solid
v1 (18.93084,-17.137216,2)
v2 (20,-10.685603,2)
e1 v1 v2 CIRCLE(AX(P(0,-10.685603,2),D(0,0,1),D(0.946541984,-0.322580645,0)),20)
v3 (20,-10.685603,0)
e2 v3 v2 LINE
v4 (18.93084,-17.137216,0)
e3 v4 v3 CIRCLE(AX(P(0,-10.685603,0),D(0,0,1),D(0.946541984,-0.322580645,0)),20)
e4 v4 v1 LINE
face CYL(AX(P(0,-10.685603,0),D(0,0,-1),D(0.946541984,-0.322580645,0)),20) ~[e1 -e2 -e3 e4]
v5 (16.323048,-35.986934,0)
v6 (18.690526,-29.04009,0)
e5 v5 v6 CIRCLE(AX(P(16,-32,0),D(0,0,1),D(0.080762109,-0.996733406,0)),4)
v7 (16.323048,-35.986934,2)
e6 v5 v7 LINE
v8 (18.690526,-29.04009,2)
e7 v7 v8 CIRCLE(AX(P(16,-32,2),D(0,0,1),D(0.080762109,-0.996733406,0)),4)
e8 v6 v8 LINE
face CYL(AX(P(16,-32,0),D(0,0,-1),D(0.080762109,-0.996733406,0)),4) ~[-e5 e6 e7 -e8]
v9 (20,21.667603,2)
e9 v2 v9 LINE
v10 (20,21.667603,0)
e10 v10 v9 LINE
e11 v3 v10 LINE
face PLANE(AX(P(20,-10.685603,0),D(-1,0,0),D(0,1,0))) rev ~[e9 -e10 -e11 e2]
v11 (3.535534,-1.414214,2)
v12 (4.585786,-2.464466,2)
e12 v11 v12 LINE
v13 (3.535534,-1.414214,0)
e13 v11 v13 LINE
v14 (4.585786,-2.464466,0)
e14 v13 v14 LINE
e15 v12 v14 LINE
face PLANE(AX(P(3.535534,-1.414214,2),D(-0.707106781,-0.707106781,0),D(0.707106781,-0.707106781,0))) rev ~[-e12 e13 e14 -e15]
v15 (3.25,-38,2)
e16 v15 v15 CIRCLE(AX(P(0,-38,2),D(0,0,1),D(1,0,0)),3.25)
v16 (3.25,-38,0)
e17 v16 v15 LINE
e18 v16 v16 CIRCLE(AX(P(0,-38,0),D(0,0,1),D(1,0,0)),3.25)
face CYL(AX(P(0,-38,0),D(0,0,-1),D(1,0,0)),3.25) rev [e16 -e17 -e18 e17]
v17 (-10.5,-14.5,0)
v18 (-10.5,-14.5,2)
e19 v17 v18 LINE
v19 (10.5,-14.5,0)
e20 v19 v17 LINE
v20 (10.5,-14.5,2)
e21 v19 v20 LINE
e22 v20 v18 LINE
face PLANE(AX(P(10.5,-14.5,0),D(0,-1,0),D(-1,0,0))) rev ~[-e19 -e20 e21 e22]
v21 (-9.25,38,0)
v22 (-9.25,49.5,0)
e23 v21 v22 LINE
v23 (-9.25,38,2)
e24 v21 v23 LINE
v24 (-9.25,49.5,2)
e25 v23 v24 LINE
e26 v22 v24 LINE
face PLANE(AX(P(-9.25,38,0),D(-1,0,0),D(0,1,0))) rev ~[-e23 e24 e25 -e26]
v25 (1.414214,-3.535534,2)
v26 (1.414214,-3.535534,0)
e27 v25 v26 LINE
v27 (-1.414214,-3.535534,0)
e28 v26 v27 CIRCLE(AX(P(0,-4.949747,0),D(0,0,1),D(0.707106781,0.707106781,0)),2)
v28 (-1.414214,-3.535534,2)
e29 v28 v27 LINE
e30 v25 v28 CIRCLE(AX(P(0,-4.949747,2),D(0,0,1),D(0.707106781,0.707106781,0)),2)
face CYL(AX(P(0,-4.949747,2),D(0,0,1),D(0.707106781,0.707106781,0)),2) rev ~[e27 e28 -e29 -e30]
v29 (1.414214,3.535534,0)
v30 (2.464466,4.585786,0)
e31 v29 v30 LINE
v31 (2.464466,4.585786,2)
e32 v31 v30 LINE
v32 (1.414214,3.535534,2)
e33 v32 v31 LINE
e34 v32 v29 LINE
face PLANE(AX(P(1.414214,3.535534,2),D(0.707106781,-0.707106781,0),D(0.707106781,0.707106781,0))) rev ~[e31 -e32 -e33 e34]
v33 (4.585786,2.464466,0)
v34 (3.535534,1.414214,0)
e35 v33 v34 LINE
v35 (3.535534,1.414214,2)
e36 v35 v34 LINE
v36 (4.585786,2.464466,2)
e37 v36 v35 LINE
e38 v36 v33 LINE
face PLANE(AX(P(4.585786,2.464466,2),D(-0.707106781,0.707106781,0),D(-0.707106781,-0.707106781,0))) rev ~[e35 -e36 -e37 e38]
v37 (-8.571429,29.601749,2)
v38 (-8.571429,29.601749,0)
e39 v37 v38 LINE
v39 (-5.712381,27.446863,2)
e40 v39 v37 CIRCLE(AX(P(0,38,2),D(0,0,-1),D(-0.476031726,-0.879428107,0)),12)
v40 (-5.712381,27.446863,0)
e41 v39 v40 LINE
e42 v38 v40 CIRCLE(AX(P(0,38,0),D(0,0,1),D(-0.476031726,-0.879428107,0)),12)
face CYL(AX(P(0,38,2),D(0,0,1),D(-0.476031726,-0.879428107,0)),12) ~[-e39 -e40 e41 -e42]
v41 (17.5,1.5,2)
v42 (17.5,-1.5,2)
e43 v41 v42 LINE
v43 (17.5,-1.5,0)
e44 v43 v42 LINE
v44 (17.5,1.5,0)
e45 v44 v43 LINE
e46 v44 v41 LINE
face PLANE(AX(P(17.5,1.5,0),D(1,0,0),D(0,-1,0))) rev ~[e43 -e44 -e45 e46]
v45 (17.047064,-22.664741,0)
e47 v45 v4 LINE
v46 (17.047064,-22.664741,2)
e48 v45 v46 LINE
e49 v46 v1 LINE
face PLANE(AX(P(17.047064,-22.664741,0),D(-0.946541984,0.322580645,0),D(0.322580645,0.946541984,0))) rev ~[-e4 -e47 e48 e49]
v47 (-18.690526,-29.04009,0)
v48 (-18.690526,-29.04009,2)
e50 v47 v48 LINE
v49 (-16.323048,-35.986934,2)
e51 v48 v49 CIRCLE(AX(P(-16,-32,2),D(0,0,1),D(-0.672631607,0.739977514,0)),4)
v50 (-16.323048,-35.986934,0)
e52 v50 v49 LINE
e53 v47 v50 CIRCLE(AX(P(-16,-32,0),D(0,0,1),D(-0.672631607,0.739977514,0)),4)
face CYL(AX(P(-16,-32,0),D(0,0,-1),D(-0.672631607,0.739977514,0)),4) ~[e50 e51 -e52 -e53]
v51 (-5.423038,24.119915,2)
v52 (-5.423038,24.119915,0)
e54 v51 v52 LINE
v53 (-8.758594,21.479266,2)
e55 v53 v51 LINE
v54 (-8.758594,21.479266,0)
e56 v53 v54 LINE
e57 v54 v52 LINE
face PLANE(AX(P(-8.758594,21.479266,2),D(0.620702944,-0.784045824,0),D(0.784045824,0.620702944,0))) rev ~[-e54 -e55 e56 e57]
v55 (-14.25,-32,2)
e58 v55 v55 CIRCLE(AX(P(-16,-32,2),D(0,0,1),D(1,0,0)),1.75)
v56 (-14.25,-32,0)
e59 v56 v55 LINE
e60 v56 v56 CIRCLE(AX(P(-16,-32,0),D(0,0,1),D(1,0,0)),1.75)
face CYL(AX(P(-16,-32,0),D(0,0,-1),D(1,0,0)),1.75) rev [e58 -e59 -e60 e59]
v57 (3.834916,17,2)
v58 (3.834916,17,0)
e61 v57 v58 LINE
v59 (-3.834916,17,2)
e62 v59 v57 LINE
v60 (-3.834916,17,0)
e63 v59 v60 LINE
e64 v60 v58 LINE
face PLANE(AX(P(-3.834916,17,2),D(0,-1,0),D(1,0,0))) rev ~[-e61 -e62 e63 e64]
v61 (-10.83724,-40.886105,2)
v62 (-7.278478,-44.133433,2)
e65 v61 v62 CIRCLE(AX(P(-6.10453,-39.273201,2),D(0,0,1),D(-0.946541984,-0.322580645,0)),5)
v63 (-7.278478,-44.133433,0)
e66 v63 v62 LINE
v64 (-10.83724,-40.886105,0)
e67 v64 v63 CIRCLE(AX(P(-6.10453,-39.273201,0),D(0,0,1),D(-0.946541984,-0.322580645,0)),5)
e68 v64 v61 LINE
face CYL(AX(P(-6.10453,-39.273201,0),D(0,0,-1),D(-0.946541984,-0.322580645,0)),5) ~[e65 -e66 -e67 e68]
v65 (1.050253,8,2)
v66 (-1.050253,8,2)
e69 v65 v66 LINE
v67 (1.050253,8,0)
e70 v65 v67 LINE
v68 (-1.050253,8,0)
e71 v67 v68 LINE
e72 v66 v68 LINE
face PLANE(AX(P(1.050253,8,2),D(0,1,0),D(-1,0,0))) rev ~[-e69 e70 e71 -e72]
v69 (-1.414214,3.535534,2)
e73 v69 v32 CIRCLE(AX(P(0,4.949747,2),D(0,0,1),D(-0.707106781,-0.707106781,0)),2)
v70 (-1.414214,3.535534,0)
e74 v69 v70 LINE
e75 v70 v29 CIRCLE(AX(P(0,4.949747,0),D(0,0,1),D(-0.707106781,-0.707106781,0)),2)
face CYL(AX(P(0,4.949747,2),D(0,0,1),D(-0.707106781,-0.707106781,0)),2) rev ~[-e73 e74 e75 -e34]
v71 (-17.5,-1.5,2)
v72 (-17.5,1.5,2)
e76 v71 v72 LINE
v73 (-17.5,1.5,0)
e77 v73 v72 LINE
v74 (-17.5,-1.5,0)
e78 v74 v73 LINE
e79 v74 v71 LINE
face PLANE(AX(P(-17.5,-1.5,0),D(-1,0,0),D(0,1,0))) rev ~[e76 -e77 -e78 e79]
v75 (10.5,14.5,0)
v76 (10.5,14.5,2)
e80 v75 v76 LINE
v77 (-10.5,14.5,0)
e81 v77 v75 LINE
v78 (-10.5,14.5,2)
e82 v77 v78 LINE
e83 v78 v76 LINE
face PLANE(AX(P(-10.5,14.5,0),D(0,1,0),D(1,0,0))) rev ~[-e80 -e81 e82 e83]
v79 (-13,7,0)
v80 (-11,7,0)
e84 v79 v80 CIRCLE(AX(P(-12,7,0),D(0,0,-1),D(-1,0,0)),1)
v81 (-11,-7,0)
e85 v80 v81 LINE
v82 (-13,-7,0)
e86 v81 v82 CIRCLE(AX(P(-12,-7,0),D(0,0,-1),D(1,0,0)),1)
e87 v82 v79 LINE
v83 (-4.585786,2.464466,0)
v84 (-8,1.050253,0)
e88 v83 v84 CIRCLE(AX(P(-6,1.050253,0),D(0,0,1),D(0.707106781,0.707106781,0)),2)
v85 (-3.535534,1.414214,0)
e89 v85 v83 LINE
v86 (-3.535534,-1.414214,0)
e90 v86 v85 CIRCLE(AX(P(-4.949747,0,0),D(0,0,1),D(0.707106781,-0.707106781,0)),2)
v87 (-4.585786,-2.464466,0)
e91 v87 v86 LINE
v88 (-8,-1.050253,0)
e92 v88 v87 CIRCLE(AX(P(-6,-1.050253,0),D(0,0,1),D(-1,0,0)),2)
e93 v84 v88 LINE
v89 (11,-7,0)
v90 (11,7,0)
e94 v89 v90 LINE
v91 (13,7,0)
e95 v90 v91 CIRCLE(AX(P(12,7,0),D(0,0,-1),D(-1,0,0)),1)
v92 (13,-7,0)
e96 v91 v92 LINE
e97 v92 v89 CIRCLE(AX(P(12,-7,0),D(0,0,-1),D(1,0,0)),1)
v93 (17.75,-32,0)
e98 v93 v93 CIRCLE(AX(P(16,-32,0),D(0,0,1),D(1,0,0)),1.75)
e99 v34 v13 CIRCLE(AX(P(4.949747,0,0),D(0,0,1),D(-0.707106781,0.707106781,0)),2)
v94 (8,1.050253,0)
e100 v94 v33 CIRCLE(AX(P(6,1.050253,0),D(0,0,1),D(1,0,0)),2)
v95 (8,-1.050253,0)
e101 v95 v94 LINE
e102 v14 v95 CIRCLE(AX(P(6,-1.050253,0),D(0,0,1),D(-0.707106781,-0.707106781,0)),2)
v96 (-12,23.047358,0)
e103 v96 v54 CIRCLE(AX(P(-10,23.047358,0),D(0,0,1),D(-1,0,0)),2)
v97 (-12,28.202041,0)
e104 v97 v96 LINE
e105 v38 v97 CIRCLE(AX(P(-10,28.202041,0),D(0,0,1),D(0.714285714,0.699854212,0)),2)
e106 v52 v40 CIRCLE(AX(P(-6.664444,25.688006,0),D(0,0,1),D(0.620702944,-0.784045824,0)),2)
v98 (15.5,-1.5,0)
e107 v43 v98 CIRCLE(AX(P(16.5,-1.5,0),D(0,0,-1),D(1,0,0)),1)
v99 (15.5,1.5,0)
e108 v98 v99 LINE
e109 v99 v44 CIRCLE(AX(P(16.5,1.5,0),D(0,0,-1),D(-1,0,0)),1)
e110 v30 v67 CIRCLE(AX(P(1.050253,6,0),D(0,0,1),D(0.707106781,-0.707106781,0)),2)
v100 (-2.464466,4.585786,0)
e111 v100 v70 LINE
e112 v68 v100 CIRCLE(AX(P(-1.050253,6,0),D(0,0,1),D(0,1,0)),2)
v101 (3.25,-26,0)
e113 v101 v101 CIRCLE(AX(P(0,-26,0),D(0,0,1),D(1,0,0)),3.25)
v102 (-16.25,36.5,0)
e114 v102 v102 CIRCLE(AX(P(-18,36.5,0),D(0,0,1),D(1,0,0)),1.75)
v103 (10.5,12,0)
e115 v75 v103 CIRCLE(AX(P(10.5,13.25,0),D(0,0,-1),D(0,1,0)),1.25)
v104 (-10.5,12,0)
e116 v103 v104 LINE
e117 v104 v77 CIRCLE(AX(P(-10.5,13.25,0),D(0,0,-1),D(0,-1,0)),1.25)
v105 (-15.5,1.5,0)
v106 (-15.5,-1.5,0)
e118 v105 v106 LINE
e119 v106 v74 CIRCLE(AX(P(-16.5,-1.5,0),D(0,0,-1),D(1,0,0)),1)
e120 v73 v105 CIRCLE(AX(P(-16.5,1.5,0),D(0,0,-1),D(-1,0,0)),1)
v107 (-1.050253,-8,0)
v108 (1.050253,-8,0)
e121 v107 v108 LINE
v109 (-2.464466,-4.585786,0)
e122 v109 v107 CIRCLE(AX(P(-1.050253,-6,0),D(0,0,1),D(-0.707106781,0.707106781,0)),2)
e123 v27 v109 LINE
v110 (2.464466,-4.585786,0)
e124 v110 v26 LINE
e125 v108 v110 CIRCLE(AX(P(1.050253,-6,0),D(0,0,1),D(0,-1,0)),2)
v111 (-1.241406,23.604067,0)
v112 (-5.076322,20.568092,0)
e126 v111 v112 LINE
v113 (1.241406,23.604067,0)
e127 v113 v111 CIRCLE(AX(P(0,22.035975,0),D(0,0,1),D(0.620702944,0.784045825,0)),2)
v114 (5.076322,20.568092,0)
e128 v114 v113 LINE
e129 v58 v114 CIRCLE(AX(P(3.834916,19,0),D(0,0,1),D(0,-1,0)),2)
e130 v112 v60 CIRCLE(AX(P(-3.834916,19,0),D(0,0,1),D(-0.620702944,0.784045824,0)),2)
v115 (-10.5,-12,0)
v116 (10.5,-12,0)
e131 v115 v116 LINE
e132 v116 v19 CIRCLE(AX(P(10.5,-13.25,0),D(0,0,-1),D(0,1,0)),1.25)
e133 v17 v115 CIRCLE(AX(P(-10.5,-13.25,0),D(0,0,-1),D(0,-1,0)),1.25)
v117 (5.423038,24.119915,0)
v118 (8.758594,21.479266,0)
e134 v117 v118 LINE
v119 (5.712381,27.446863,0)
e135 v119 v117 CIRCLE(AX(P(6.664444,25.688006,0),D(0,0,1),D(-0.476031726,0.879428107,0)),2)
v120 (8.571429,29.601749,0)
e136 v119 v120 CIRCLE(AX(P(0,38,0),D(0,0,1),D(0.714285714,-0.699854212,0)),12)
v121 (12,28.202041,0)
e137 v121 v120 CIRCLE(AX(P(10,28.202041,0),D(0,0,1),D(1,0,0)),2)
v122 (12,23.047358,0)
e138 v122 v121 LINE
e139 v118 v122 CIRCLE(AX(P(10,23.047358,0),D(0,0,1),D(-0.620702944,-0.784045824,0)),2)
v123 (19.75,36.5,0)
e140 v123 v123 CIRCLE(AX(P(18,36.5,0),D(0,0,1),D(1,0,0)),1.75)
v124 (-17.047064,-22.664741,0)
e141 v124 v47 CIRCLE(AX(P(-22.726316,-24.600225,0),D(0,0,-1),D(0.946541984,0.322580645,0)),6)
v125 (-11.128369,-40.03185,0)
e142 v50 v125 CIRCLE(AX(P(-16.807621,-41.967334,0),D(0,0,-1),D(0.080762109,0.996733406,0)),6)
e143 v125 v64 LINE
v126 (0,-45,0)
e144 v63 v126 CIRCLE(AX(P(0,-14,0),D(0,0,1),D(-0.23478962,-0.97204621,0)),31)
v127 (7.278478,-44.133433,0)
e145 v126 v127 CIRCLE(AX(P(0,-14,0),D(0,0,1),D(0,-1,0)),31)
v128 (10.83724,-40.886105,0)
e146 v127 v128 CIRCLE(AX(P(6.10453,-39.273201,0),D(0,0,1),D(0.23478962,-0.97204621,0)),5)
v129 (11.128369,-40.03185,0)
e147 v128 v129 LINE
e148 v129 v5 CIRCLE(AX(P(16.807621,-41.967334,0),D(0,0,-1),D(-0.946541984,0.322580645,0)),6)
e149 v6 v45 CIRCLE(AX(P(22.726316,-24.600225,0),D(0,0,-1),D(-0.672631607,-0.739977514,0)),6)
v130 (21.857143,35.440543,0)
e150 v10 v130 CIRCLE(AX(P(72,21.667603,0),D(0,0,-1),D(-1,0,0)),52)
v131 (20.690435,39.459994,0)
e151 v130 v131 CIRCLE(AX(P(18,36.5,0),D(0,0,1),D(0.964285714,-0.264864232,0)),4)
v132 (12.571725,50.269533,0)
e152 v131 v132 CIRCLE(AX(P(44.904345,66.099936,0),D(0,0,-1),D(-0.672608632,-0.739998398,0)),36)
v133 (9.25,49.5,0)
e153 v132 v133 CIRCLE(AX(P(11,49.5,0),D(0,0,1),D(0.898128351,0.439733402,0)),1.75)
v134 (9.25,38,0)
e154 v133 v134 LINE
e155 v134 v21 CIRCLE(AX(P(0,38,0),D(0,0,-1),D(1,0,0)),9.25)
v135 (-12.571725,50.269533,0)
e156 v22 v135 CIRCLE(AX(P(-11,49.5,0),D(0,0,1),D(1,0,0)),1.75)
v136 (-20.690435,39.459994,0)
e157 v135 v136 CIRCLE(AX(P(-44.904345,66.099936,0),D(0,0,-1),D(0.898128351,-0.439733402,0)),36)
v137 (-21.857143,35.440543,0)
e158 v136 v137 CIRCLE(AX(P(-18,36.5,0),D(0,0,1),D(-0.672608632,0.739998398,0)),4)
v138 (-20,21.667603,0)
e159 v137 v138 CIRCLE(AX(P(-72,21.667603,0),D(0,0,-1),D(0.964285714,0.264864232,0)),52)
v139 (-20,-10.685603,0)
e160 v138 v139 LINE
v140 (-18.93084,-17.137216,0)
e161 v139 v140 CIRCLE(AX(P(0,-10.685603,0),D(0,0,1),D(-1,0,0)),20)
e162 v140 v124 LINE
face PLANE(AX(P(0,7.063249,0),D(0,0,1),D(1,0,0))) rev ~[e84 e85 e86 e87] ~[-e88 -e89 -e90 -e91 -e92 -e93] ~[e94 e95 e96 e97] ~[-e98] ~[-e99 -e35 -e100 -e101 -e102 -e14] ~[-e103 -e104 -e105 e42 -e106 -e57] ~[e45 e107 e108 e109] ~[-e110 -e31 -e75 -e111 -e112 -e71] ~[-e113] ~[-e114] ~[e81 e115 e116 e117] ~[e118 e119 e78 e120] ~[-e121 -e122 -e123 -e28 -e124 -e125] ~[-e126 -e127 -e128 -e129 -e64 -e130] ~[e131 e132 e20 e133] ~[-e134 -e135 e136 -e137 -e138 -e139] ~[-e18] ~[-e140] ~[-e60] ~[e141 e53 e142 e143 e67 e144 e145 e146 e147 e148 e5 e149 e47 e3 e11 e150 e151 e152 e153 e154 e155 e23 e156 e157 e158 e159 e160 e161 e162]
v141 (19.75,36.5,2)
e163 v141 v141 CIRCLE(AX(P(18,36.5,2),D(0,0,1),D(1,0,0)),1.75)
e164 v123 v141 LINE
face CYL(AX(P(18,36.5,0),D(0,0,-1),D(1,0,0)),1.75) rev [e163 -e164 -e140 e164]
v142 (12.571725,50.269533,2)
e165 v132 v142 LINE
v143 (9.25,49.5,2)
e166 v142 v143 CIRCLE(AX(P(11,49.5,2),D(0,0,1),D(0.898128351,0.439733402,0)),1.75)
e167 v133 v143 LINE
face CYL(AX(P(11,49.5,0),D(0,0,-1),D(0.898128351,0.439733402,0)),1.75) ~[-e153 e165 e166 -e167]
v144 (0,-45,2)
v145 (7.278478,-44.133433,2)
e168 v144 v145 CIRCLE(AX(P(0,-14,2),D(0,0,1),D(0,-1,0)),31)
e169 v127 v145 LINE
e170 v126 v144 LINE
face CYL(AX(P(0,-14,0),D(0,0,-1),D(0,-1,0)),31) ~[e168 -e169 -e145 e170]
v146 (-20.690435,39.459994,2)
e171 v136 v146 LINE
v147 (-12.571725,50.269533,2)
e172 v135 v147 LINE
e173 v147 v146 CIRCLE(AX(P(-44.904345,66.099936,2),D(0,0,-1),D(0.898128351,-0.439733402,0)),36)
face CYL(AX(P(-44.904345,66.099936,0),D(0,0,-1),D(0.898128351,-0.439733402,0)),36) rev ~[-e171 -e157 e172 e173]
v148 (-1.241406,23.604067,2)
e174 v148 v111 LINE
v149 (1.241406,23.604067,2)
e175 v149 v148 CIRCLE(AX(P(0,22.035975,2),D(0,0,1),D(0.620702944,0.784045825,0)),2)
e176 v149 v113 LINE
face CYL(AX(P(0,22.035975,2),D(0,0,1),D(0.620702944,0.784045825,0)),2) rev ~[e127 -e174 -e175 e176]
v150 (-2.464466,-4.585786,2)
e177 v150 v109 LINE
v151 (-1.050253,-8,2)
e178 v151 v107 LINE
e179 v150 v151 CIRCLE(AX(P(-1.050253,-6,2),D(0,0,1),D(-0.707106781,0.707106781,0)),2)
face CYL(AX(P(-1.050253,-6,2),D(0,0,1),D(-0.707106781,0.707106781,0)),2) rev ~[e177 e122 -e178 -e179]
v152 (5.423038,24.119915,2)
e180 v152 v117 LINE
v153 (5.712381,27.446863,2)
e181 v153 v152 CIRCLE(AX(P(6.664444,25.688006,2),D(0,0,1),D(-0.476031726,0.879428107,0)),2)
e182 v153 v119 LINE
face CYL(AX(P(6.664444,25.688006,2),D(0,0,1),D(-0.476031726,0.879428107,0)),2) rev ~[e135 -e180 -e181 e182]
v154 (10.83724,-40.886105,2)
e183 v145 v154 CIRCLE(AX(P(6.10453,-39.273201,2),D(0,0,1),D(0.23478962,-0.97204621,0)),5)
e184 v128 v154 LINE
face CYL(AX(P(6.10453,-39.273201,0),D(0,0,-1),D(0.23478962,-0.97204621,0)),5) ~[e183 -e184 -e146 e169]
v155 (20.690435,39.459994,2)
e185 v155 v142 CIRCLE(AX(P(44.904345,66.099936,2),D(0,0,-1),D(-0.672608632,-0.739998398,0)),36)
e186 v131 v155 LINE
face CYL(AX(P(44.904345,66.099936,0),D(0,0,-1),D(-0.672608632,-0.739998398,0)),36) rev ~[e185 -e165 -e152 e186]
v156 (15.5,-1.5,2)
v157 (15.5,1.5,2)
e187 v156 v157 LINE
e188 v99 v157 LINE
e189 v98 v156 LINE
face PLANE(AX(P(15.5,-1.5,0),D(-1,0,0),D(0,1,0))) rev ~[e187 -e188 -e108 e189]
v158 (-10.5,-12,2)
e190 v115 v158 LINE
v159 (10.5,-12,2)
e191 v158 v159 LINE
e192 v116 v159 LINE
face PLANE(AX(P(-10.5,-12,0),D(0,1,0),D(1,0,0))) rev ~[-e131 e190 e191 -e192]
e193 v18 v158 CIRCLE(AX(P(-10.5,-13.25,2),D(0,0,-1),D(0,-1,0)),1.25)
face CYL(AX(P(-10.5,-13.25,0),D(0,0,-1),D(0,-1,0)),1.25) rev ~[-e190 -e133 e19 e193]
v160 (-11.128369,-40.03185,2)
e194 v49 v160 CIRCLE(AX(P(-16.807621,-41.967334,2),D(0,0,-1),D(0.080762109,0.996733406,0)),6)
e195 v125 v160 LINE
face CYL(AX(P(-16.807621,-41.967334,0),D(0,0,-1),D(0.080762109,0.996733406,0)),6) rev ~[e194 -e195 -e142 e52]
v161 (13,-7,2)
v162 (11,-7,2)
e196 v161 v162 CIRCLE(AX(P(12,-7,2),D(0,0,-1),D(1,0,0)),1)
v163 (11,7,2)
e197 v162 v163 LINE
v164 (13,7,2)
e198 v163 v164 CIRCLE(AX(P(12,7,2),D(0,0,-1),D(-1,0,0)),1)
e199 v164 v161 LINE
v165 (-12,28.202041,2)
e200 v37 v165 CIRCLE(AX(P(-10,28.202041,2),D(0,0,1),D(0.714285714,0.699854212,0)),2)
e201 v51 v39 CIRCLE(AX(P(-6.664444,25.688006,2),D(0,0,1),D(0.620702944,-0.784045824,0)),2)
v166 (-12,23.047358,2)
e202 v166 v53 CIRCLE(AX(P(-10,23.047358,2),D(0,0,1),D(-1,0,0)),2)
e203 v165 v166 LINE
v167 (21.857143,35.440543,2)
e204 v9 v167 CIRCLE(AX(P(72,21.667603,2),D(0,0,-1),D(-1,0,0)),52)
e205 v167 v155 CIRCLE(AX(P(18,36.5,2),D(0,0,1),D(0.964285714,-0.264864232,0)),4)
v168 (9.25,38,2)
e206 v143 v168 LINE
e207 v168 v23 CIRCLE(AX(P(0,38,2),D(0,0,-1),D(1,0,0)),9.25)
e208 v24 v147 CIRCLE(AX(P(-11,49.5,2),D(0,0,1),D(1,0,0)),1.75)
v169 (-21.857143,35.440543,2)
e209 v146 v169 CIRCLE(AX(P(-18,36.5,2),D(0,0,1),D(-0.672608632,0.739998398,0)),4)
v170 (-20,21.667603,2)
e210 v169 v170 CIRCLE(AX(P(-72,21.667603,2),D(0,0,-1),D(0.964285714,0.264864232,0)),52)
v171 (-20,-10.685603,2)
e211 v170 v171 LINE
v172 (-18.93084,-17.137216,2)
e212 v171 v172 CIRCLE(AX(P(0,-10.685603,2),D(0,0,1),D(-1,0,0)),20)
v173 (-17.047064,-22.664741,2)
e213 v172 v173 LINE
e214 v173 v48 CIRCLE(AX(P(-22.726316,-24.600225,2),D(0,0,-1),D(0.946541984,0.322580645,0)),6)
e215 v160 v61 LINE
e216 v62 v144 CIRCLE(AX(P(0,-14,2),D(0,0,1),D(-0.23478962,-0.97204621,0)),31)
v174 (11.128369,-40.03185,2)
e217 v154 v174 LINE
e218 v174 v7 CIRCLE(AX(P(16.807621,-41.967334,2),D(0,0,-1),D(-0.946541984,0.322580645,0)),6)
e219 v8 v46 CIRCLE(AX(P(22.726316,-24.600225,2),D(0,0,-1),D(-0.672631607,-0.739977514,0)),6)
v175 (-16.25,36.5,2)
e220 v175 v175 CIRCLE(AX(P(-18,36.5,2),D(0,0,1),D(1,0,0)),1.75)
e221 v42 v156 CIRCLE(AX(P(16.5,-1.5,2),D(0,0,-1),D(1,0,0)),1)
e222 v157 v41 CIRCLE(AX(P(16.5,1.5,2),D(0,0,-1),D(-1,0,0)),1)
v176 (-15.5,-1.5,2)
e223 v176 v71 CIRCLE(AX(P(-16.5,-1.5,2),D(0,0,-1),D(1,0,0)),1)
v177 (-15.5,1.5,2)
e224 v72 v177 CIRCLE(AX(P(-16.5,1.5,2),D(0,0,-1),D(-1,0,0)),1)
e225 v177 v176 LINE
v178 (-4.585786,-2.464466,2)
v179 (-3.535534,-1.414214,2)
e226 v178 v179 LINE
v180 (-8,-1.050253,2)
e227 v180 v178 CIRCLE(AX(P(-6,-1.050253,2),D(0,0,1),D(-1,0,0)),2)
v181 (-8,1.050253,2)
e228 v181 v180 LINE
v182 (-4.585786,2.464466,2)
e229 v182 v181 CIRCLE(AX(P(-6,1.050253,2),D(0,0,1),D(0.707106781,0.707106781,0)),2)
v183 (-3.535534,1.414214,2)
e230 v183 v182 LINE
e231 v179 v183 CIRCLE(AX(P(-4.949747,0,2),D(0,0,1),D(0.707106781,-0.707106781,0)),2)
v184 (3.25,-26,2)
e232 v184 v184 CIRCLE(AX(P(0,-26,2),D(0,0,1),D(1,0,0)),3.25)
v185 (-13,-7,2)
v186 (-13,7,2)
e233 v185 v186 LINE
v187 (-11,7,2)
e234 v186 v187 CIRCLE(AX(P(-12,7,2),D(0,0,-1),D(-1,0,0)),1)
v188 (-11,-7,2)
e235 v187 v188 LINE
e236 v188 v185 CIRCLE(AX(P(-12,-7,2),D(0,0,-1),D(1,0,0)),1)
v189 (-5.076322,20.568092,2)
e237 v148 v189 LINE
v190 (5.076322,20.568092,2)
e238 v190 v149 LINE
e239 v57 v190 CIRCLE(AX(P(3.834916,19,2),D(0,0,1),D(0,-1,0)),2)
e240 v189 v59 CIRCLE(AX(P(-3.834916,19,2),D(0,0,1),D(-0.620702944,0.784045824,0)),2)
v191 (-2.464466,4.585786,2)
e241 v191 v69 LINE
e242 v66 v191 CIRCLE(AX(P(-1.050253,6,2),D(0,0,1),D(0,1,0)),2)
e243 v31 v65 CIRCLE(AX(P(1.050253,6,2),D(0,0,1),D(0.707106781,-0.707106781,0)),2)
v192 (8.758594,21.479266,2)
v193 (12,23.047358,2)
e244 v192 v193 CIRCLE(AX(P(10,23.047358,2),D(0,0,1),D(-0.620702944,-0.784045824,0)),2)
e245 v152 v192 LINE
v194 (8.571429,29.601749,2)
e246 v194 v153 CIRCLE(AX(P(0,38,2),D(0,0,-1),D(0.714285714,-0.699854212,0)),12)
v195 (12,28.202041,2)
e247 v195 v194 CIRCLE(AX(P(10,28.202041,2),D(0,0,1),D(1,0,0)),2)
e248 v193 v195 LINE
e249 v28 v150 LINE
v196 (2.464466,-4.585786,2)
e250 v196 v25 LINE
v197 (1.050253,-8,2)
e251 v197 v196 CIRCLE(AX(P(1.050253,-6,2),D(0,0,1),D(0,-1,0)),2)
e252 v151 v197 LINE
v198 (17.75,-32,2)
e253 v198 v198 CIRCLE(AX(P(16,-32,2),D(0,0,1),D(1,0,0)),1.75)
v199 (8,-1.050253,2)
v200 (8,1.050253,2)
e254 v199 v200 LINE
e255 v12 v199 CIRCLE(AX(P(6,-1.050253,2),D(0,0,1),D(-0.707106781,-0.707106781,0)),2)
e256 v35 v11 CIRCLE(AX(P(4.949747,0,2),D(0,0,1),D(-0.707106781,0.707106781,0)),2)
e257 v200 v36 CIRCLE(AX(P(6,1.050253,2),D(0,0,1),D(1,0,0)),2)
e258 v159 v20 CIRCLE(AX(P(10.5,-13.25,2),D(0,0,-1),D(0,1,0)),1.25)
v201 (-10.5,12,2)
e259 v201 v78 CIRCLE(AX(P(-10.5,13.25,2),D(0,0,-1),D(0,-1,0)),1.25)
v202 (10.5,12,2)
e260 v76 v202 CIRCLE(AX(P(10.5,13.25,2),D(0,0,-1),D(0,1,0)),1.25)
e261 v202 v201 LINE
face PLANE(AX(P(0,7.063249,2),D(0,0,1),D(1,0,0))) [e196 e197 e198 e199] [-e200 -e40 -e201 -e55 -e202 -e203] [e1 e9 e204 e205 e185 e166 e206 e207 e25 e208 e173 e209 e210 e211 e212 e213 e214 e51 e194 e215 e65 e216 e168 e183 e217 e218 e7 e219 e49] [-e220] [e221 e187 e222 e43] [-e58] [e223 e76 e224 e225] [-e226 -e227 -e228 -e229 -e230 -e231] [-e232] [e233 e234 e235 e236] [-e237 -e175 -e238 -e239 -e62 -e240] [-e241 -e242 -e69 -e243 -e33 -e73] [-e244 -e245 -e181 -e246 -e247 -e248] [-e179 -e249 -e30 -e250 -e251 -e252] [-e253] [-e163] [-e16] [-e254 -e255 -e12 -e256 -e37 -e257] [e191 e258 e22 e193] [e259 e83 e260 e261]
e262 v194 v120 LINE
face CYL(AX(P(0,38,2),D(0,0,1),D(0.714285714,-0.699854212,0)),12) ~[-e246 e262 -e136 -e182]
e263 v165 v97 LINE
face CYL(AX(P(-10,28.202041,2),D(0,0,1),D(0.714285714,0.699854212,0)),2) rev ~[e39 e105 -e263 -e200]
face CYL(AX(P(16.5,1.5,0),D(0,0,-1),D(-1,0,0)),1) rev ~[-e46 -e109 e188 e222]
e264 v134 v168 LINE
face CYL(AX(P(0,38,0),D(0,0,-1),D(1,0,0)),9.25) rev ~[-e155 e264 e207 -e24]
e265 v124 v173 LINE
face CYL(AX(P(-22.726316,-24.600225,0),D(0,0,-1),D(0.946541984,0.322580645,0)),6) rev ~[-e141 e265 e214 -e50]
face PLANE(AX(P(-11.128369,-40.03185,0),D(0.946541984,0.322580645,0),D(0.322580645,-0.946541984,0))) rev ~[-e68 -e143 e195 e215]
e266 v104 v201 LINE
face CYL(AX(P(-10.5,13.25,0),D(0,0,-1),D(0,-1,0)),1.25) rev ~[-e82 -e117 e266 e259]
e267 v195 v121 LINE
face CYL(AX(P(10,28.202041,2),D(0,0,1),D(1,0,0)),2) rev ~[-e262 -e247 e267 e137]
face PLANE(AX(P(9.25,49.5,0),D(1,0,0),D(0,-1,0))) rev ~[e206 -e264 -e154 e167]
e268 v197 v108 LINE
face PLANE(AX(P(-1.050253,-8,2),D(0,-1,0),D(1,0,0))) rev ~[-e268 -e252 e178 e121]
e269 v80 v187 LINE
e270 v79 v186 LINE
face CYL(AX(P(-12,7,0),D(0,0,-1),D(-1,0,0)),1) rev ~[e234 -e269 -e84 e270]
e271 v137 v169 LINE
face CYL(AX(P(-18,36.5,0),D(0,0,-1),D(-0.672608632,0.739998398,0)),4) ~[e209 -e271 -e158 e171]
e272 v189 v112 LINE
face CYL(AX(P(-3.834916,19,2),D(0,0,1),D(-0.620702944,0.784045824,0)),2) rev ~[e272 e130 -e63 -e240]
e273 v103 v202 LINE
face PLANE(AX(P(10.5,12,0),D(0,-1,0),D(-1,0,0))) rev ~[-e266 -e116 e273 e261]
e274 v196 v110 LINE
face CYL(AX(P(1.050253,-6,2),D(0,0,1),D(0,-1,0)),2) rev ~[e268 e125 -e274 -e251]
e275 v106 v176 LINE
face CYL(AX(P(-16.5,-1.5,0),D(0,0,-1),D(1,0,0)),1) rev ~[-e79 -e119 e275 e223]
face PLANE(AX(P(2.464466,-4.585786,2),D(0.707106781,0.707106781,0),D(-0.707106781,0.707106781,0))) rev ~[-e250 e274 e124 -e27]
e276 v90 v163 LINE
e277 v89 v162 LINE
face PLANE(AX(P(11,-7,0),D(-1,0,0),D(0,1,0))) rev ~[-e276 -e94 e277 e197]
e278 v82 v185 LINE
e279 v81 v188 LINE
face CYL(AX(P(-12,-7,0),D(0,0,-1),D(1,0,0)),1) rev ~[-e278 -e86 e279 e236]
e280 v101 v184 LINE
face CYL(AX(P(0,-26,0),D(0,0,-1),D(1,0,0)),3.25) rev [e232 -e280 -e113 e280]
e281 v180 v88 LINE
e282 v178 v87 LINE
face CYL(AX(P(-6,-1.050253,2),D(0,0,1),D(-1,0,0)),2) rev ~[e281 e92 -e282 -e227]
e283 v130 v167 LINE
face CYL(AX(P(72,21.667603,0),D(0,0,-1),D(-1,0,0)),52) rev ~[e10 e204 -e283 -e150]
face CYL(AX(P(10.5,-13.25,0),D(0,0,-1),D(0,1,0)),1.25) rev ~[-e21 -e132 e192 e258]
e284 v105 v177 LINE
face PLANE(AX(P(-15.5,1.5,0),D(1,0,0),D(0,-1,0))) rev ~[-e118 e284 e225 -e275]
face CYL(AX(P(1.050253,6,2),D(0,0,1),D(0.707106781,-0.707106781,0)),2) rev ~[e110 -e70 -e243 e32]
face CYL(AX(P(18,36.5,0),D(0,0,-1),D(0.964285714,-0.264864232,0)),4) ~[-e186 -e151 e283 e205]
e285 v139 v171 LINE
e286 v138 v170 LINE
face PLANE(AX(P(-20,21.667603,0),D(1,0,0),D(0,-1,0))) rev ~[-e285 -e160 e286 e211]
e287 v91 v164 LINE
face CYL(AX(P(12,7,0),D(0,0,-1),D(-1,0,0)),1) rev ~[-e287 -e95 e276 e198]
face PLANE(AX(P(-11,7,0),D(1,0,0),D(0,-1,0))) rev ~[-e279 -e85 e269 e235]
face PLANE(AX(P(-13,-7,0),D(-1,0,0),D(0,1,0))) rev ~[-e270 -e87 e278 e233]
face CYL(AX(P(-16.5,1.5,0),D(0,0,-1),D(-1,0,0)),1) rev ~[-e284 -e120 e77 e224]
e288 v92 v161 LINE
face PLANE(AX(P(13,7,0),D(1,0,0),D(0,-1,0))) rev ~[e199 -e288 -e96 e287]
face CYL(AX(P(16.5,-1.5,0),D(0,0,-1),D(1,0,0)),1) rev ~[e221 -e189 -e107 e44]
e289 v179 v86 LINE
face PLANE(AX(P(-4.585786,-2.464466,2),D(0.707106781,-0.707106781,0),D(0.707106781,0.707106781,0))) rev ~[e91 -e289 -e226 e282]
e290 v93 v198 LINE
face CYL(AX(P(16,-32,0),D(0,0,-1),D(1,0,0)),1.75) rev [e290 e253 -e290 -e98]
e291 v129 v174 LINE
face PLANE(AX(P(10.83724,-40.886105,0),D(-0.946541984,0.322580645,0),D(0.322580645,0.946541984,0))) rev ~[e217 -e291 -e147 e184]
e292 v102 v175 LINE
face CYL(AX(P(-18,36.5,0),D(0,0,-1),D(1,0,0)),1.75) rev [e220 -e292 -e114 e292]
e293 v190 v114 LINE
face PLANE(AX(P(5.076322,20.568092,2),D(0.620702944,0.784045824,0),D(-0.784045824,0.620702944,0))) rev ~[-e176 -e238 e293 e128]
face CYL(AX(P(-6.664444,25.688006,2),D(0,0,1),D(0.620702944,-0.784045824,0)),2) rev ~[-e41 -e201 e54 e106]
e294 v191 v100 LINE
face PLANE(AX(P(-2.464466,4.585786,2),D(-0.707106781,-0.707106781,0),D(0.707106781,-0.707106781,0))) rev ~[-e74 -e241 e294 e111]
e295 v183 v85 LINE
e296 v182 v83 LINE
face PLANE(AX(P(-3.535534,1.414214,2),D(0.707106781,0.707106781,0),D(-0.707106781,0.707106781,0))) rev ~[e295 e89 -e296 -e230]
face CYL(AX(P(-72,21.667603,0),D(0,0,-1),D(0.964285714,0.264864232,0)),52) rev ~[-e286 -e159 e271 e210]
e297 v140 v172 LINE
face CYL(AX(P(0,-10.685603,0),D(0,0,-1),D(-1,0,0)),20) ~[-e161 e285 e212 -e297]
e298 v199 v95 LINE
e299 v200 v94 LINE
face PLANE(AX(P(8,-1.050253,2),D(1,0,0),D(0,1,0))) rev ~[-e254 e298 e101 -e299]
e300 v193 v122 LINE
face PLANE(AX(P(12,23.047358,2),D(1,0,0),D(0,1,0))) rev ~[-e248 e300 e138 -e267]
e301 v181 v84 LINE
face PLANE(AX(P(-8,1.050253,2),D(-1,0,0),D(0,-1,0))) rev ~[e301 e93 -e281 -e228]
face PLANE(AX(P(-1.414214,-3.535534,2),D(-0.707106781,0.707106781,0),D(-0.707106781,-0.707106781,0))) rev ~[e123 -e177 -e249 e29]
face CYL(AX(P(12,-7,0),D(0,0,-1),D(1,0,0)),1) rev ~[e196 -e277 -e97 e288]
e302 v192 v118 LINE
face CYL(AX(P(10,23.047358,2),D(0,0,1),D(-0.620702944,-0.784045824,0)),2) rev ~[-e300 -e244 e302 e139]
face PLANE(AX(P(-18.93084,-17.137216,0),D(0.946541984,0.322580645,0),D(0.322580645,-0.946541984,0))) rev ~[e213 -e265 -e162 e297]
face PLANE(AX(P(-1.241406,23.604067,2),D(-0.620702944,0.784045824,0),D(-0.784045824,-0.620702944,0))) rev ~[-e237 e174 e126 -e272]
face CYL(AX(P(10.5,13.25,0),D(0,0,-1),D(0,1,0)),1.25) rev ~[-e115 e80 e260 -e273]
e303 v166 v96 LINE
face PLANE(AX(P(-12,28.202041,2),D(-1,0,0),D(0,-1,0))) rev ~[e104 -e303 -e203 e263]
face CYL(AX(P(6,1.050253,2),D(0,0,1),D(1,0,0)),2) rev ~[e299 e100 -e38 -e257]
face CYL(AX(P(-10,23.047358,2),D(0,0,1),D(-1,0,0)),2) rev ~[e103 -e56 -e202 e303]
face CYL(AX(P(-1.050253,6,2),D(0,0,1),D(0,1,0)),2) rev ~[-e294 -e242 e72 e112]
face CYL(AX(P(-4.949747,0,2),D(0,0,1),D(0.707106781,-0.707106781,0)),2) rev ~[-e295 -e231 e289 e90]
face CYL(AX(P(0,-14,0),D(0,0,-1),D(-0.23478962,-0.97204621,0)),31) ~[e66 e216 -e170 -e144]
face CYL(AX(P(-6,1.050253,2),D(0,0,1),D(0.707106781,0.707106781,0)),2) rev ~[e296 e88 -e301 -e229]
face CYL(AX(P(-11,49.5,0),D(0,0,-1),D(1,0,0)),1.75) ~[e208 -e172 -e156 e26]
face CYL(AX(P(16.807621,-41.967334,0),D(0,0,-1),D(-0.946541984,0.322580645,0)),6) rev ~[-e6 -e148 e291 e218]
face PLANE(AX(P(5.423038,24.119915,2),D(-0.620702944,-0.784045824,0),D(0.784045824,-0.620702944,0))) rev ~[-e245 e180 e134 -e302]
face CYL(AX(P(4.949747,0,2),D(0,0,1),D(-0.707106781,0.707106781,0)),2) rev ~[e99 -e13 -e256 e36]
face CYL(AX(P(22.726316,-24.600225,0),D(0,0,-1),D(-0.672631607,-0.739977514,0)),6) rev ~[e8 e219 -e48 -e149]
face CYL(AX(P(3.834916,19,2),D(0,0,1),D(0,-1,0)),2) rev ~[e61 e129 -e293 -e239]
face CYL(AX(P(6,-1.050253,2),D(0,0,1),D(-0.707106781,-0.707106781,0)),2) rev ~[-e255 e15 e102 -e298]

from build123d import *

# Parameters (mm, degrees)
F0_R     = 1.75
F0_R_2   = 3.25
F1_DEPTH = 2
F3_DEPTH = 25


# Not quite as in the source:
# - a feature names something its author has since deleted; it is built from what else it names


with BuildPart() as f1:
    # F0 (on Top) → F1 (new body)
    with BuildSketch(Plane.XY):
        with BuildLine():
            ThreePointArc((-12.5717246149, 50.2695334528), (-16.1191217808, 44.4802479149), (-20.6904345264, 39.4599935911))
            ThreePointArc((-20.6904345264, 39.4599935911), (-21.8414434806, 37.6150390062), (-21.8571428571, 35.4405430733))
            ThreePointArc((-21.8571428571, 35.4405430733), (-20.4663771338, 28.6163953155), (-20, 21.6676030258))
            Line((-20, 21.6676030258), (-20, -10.6856030045))
            ThreePointArc((-20, -10.6856030045), (-19.7308995433, -13.9554047127), (-18.9308396789, -17.1372159077))
            Line((-18.9308396789, -17.1372159077), (-17.0470641697, -22.6647409918))
            ThreePointArc((-17.0470641697, -22.6647409918), (-16.9162578432, -26.0979642803), (-18.6905264293, -29.0400899451))
            ThreePointArc((-18.6905264293, -29.0400899451), (-19.7861679358, -33.2903225806), (-16.3230484377, -35.9869336221))
            ThreePointArc((-16.3230484377, -35.9869336221), (-13.1213600073, -37.2332576723), (-11.1283691906, -40.0318501842))
            Line((-11.1283691906, -40.0318501842), (-10.837240035, -40.8861046865))
            ThreePointArc((-10.837240035, -40.8861046865), (-9.4747581102, -42.9666501557), (-7.2784782144, -44.1334325108))
            ThreePointArc((-7.2784782144, -44.1334325108), (-3.6649414842, -44.7825957956), (0, -45))
            ThreePointArc((0, -45), (3.6649414842, -44.7825957956), (7.2784782144, -44.1334325108))
            ThreePointArc((7.2784782144, -44.1334325108), (9.4747581102, -42.9666501557), (10.837240035, -40.8861046865))
            Line((10.837240035, -40.8861046865), (11.1283691906, -40.0318501842))
            ThreePointArc((11.1283691906, -40.0318501842), (13.1213600073, -37.2332576723), (16.3230484377, -35.9869336221))
            ThreePointArc((16.3230484377, -35.9869336221), (19.7861679358, -33.2903225806), (18.6905264293, -29.0400899451))
            ThreePointArc((18.6905264293, -29.0400899451), (16.9162578432, -26.0979642803), (17.0470641697, -22.6647409918))
            Line((17.0470641697, -22.6647409918), (18.9308396789, -17.1372159077))
            ThreePointArc((18.9308396789, -17.1372159077), (19.7308995433, -13.9554047127), (20, -10.6856030045))
            Line((20, -10.6856030045), (20, 21.6676030258))
            ThreePointArc((20, 21.6676030258), (20.4663771338, 28.6163953155), (21.8571428571, 35.4405430733))
            ThreePointArc((21.8571428571, 35.4405430733), (21.8414434806, 37.6150390062), (20.6904345264, 39.4599935911))
            ThreePointArc((20.6904345264, 39.4599935911), (16.1191217808, 44.4802479149), (12.5717246149, 50.2695334528))
            ThreePointArc((12.5717246149, 50.2695334528), (10.6050430884, 51.2048486848), (9.25, 49.5))
            Line((9.25, 49.5), (9.25, 38))
            ThreePointArc((9.25, 38), (0, 28.75), (-9.25, 38))
            Line((-9.25, 38), (-9.25, 49.5))
            ThreePointArc((-9.25, 49.5), (-10.6050430884, 51.2048486848), (-12.5717246149, 50.2695334528))
        make_face()
        with Locations((-16, -32)):
            Circle(F0_R, mode=Mode.SUBTRACT)
        with BuildLine():
            Line((-17.5, -1.5), (-17.5, 1.5))
            ThreePointArc((-17.5, 1.5), (-16.5, 2.5), (-15.5, 1.5))
            Line((-15.5, 1.5), (-15.5, -1.5))
            ThreePointArc((-15.5, -1.5), (-16.5, -2.5), (-17.5, -1.5))
        make_face(mode=Mode.SUBTRACT)
        with BuildLine():
            Line((-13, -7), (-13, 7))
            ThreePointArc((-13, 7), (-12, 8), (-11, 7))
            Line((-11, 7), (-11, -7))
            ThreePointArc((-11, -7), (-12, -8), (-13, -7))
        make_face(mode=Mode.SUBTRACT)
        with Locations((0, -38)):
            Circle(F0_R_2, mode=Mode.SUBTRACT)
        with Locations((0, -26)):
            Circle(F0_R_2, mode=Mode.SUBTRACT)
        with Locations((16, -32)):
            Circle(F0_R, mode=Mode.SUBTRACT)
        with BuildLine():
            Line((10.5, -14.5), (-10.5, -14.5))
            ThreePointArc((-10.5, -14.5), (-11.75, -13.25), (-10.5, -12))
            Line((-10.5, -12), (10.5, -12))
            ThreePointArc((10.5, -12), (11.75, -13.25), (10.5, -14.5))
        make_face(mode=Mode.SUBTRACT)
        with BuildLine():
            Line((11, -7), (11, 7))
            ThreePointArc((11, 7), (12, 8), (13, 7))
            Line((13, 7), (13, -7))
            ThreePointArc((13, -7), (12, -8), (11, -7))
        make_face(mode=Mode.SUBTRACT)
        with BuildLine():
            Line((15.5, -1.5), (15.5, 1.5))
            ThreePointArc((15.5, 1.5), (16.5, 2.5), (17.5, 1.5))
            Line((17.5, 1.5), (17.5, -1.5))
            ThreePointArc((17.5, -1.5), (16.5, -2.5), (15.5, -1.5))
        make_face(mode=Mode.SUBTRACT)
        with Locations((-18, 36.5)):
            Circle(F0_R, mode=Mode.SUBTRACT)
        with BuildLine():
            Line((10.5, 12), (-10.5, 12))
            ThreePointArc((-10.5, 12), (-11.75, 13.25), (-10.5, 14.5))
            Line((-10.5, 14.5), (10.5, 14.5))
            ThreePointArc((10.5, 14.5), (11.75, 13.25), (10.5, 12))
        make_face(mode=Mode.SUBTRACT)
        with Locations((18, 36.5)):
            Circle(F0_R, mode=Mode.SUBTRACT)
    extrude(amount=F1_DEPTH)

    # F2 (on face) → F3 (cut)
    with BuildSketch(Plane.XY.offset(2)):
        with BuildLine():
            Line((1.0502525317, 8), (-1.0502525317, 8))
            ThreePointArc((-1.0502525317, 8), (-2.8980115967, 6.7653668647), (-2.4644660941, 4.5857864376))
            Line((-2.4644660941, 4.5857864376), (-1.4142135624, 3.5355339059))
            ThreePointArc((-1.4142135624, 3.5355339059), (0, 2.9497474683), (1.4142135624, 3.5355339059))
            Line((1.4142135624, 3.5355339059), (2.4644660941, 4.5857864376))
            ThreePointArc((2.4644660941, 4.5857864376), (2.8980115967, 6.7653668647), (1.0502525317, 8))
        make_face()
        with BuildLine():
            ThreePointArc((-2.4644660941, -4.5857864376), (-2.8980115967, -6.7653668647), (-1.0502525317, -8))
            Line((-1.0502525317, -8), (1.0502525317, -8))
            ThreePointArc((1.0502525317, -8), (2.8980115967, -6.7653668647), (2.4644660941, -4.5857864376))
            Line((2.4644660941, -4.5857864376), (1.4142135624, -3.5355339059))
            ThreePointArc((1.4142135624, -3.5355339059), (0, -2.9497474683), (-1.4142135624, -3.5355339059))
            Line((-1.4142135624, -3.5355339059), (-2.4644660941, -4.5857864376))
        make_face()
        with BuildLine():
            ThreePointArc((-4.5857864376, 2.4644660941), (-6.7653668647, 2.8980115967), (-8, 1.0502525317))
            Line((-8, 1.0502525317), (-8, -1.0502525317))
            ThreePointArc((-8, -1.0502525317), (-6.7653668647, -2.8980115967), (-4.5857864376, -2.4644660941))
            Line((-4.5857864376, -2.4644660941), (-3.5355339059, -1.4142135624))
            ThreePointArc((-3.5355339059, -1.4142135624), (-2.9497474683, 0), (-3.5355339059, 1.4142135624))
            Line((-3.5355339059, 1.4142135624), (-4.5857864376, 2.4644660941))
        make_face()
        with BuildLine():
            Line((8, -1.0502525317), (8, 1.0502525317))
            ThreePointArc((8, 1.0502525317), (6.7653668647, 2.8980115967), (4.5857864376, 2.4644660941))
            Line((4.5857864376, 2.4644660941), (3.5355339059, 1.4142135624))
            ThreePointArc((3.5355339059, 1.4142135624), (2.9497474683, 0), (3.5355339059, -1.4142135624))
            Line((3.5355339059, -1.4142135624), (4.5857864376, -2.4644660941))
            ThreePointArc((4.5857864376, -2.4644660941), (6.7653668647, -2.8980115967), (8, -1.0502525317))
        make_face()
        with BuildLine():
            ThreePointArc((-5.0763219385, 20.5680916489), (-5.7238553417, 18.3428026544), (-3.8349160497, 17))
            Line((-3.8349160497, 17), (3.8349160497, 17))
            ThreePointArc((3.8349160497, 17), (5.7238553417, 18.3428026544), (5.0763219385, 20.5680916489))
            Line((5.0763219385, 20.5680916489), (1.2414058887, 23.604066855))
            ThreePointArc((1.2414058887, 23.604066855), (0, 24.035975206), (-1.2414058887, 23.604066855))
            Line((-1.2414058887, 23.604066855), (-5.0763219385, 20.5680916489))
        make_face()
        with BuildLine():
            ThreePointArc((-8.5714285714, 29.6017494533), (-10.755928946, 30.0536812284), (-12, 28.2020410289))
            Line((-12, 28.2020410289), (-12, 23.0473581273))
            ThreePointArc((-12, 23.0473581273), (-10.870973083, 21.246967645), (-8.7585941113, 21.4792664784))
            Line((-8.7585941113, 21.4792664784), (-5.4230382746, 24.1199148491))
            ThreePointArc((-5.4230382746, 24.1199148491), (-4.6719651901, 25.8612910654), (-5.7123807114, 27.4468627126))
            ThreePointArc((-5.7123807114, 27.4468627126), (-7.2227201333, 28.4170821836), (-8.5714285714, 29.6017494533))
        make_face()
        with BuildLine():
            Line((12, 23.0473581273), (12, 28.2020410289))
            ThreePointArc((12, 28.2020410289), (10.755928946, 30.0536812284), (8.5714285714, 29.6017494533))
            ThreePointArc((8.5714285714, 29.6017494533), (7.2227201333, 28.4170821836), (5.7123807114, 27.4468627126))
            ThreePointArc((5.7123807114, 27.4468627126), (4.6719651901, 25.8612910654), (5.4230382746, 24.1199148491))
            Line((5.4230382746, 24.1199148491), (8.7585941113, 21.4792664784))
            ThreePointArc((8.7585941113, 21.4792664784), (10.870973083, 21.246967645), (12, 23.0473581273))
        make_face()
    extrude(amount=-F3_DEPTH, mode=Mode.SUBTRACT)


solid = f1.part
